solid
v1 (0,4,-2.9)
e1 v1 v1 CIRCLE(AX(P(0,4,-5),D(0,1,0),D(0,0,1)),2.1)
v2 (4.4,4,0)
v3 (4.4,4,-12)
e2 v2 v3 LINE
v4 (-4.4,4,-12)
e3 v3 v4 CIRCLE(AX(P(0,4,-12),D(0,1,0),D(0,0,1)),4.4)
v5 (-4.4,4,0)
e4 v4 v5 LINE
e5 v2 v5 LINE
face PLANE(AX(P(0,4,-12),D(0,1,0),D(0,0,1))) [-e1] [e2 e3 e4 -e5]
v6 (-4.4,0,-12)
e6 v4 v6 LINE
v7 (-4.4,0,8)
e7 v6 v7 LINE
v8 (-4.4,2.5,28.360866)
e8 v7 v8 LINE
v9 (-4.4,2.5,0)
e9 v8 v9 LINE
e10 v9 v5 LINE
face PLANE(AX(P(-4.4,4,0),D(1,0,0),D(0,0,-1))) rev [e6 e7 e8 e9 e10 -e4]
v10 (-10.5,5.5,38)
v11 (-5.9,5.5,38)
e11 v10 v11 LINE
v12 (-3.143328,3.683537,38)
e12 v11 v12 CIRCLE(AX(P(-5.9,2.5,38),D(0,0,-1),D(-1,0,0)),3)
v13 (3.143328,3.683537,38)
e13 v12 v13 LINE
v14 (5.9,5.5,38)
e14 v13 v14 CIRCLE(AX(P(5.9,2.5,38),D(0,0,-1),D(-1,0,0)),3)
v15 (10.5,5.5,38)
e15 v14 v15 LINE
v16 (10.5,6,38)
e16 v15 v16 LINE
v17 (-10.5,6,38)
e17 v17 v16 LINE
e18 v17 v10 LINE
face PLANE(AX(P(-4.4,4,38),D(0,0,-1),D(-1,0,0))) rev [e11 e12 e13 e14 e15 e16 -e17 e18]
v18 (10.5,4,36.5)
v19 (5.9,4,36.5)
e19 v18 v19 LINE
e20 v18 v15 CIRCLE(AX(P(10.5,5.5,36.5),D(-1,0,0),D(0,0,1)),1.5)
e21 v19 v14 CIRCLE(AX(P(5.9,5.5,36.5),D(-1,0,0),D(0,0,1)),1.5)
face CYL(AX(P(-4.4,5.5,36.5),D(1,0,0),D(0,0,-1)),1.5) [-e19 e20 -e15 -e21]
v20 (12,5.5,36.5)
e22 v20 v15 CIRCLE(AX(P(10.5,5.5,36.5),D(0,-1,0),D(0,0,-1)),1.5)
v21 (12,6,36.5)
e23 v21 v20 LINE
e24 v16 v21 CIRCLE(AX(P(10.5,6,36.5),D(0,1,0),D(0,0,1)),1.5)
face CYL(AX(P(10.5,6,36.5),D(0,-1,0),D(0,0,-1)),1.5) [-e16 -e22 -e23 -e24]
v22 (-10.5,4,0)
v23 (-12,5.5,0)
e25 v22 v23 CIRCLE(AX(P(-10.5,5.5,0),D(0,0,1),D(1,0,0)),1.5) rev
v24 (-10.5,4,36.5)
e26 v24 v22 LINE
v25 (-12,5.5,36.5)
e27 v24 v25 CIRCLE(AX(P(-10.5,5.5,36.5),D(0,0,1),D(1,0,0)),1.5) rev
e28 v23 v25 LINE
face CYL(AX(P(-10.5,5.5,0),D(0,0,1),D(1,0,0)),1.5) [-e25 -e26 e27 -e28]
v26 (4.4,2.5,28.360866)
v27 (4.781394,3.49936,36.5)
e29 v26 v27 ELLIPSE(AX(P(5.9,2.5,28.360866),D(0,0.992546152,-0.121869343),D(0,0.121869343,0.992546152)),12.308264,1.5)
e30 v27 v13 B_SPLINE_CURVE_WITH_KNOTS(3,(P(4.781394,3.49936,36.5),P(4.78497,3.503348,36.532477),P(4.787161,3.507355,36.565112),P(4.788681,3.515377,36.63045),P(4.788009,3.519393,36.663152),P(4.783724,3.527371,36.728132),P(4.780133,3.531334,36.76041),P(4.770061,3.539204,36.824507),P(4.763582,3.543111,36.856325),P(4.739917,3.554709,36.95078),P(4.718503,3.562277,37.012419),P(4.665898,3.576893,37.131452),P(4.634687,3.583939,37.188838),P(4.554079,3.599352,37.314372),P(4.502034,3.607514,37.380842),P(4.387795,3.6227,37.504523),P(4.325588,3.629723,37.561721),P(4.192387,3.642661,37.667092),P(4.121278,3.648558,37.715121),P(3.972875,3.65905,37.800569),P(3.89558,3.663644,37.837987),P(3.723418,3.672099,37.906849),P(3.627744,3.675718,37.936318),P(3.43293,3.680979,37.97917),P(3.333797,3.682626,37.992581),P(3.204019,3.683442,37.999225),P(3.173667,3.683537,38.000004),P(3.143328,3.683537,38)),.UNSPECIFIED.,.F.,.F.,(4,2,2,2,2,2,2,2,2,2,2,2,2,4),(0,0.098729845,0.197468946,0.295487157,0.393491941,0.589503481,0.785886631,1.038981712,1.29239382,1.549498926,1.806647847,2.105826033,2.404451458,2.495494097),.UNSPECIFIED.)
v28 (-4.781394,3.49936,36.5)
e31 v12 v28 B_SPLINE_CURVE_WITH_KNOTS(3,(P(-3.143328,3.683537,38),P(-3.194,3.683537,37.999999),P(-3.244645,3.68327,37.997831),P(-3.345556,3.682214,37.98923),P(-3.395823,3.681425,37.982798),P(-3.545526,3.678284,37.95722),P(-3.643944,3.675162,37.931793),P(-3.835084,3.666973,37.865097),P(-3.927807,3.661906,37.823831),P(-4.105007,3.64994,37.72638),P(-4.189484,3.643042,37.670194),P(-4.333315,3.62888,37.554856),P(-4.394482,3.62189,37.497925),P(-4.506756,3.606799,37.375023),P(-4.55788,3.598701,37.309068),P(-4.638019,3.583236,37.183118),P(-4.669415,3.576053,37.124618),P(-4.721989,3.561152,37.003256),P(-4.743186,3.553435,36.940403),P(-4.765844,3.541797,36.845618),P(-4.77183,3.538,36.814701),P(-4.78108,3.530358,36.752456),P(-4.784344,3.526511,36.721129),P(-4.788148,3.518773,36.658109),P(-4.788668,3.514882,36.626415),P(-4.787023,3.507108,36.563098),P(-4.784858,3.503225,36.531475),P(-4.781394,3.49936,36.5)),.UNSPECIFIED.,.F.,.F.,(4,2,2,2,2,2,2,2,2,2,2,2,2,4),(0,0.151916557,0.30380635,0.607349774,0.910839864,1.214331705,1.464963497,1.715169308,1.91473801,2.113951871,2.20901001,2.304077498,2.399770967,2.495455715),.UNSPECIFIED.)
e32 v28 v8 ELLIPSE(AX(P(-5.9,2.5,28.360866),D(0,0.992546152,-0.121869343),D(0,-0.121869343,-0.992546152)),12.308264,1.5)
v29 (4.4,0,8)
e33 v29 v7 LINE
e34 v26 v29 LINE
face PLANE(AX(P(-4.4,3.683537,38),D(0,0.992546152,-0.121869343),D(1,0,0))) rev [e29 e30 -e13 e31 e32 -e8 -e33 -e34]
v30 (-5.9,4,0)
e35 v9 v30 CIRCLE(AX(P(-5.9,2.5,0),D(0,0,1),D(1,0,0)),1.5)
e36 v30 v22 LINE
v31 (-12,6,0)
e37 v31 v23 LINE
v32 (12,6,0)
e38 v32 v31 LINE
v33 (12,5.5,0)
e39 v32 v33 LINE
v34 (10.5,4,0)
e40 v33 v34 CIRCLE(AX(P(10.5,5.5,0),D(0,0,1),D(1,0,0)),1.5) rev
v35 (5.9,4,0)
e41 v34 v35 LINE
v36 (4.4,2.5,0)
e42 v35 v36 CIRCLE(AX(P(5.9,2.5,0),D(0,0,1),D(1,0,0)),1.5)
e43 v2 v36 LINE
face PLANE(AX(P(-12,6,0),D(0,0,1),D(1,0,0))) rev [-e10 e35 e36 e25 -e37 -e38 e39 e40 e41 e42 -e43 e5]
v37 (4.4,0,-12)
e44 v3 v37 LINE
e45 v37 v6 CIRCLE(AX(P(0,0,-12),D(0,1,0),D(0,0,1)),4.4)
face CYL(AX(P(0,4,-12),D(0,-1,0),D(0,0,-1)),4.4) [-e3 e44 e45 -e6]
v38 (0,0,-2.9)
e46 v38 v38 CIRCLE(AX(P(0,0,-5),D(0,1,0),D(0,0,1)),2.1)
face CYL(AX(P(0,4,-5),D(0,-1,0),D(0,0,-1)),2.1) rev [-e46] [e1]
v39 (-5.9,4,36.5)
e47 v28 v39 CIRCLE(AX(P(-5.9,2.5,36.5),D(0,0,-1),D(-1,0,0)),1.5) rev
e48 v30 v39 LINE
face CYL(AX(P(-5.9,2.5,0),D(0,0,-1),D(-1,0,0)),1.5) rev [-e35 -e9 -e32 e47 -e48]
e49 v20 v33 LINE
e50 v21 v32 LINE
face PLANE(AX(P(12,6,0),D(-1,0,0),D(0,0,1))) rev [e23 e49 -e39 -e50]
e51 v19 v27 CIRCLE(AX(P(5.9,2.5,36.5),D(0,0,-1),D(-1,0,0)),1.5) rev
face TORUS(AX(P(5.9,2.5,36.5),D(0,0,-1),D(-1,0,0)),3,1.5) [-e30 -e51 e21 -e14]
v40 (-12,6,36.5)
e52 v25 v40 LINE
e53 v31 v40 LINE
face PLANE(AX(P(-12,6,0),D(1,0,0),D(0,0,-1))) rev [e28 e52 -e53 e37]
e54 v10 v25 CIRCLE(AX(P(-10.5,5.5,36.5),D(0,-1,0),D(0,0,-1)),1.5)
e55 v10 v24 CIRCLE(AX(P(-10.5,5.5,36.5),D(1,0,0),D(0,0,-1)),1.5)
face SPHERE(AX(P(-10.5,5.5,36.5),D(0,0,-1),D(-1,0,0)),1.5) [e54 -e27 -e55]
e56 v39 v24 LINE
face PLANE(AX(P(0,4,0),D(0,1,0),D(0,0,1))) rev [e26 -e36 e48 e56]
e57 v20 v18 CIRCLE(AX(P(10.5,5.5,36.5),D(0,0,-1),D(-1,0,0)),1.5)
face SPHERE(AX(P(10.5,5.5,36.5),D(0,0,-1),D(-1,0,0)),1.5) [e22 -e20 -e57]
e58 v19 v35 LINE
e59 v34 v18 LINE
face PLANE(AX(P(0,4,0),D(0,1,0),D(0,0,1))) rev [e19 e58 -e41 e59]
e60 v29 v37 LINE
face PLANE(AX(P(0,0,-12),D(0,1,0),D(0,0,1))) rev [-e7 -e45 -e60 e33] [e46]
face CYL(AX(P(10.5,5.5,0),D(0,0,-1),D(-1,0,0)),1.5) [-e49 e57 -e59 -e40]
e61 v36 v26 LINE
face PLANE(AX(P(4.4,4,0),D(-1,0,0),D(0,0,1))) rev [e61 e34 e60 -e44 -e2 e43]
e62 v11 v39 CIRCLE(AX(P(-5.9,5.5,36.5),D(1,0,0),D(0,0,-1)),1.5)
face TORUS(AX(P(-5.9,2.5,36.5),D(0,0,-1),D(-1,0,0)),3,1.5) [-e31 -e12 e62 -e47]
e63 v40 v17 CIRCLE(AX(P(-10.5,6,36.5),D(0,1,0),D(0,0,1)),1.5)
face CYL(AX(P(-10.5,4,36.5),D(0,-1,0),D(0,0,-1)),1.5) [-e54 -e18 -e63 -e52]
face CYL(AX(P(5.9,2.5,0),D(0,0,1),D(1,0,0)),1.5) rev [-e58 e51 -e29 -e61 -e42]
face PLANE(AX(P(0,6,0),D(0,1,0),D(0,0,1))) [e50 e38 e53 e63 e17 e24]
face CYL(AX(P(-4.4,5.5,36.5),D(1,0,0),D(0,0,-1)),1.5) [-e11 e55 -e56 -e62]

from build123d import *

# Parameters (mm, degrees)
SKETCH2_R           = 2.1
BOSS_EXTRUDE1_DEPTH = 4
BOSS_EXTRUDE2_DEPTH = 2
CHAMFER1_SIZE       = 30
CHAMFER1_SIZE2      = 3.683536827087146
FILLET2_R           = 1.5
FILLET4_R           = 1.5


with BuildPart() as part:
    # Sketch2 → Boss-Extrude1 (new body)
    with BuildSketch(Plane(origin=(0, 0, 0), x_dir=(1, 0, 0), z_dir=(0, 1, 0))):
        with BuildLine():
            Line((-4.4, -1.507e-14), (-4.4, 12))
            ThreePointArc((-4.4, 12), (2.7e-16, 16.4), (4.4, 12))
            Line((4.4, 12), (4.4, 1.507e-14))
            Line((4.4, 1.507e-14), (4.4, -38.000000000000014))
            Line((4.4, -38.000000000000014), (-4.399999999999994, -38.000000000000014))
            Line((-4.399999999999994, -38.000000000000014), (-4.4, -1.507e-14))
        make_face()
        with Locations(Location((0, 5, 0), (0, 0, 270))):
            Circle(SKETCH2_R, mode=Mode.SUBTRACT)
    extrude(amount=BOSS_EXTRUDE1_DEPTH)

    # Sketch3 → Boss-Extrude2 (add)
    with BuildSketch(Plane(origin=(0, 4, 0), x_dir=(1, 0, 0), z_dir=(0, 1, 0))):
        Polygon((-12, 0), (12, 0), (12.000000000000002, -38), (-11.999999999999995, -38), align=None)
    extrude(amount=BOSS_EXTRUDE2_DEPTH)

    # Chamfer1
    chamfer1_edges = [part.edges().sort_by_distance(p)[0] for p in [
        (3.55e-15, 0, 38.000000000000014),
    ]]
    chamfer1_side = [part.faces().sort_by_distance(p)[0] for p in [
        (1.53e-15, 0, 11.756614981879217),
    ]]
    chamfer(chamfer1_edges, length=CHAMFER1_SIZE, length2=CHAMFER1_SIZE2, reference=chamfer1_side[0])

    # Fillet2
    # the kernel refuses this fillet: 1.5 mm, written as the material it adds along each edge
    with BuildSketch(Plane(origin=(-4.399999999999994, 4, 38.000000000000014), x_dir=(-4.14e-15, -1, 0), z_dir=(-1.2e-16, 0, -1))) as fillet2_piece_1_section:
        with BuildLine():
            CenterArc((FILLET2_R, FILLET2_R), FILLET2_R, 180, 89.99999999999977)
            Line((6.22e-15, FILLET2_R), (0, 0))
            Line((0, 0), (FILLET2_R, 0))
        make_face()
    fillet2_piece_1 = extrude(amount=38.000000000000014, mode=Mode.PRIVATE)
    fillet2_piece_1 = split(fillet2_piece_1, bisect_by=Plane(origin=(-4.741166225178414, 1.3298279167086908, 18.830579243267316), z_dir=(0, 0.992546151641322, -0.12186934340514775)), keep=Keep.TOP, mode=Mode.PRIVATE)
    add(fillet2_piece_1)
    with BuildSketch(Plane(origin=(4.4, 4, 0), x_dir=(0, -1, 0), z_dir=(0, 0, 1))) as fillet2_piece_2_section:
        with BuildLine():
            CenterArc((FILLET2_R, FILLET2_R), FILLET2_R, 180, 90)
            Line((0, FILLET2_R), (0, 0))
            Line((0, 0), (FILLET2_R, 0))
        make_face()
    fillet2_piece_2 = extrude(amount=38.000000000000014, mode=Mode.PRIVATE)
    fillet2_piece_2 = split(fillet2_piece_2, bisect_by=Plane(origin=(4.741166225178429, 1.3298279167086202, 18.830579243266737), z_dir=(0, 0.992546151641322, -0.12186934340514775)), keep=Keep.TOP, mode=Mode.PRIVATE)
    add(fillet2_piece_2)
    # the kernel refuses this fillet: 1.5 mm, written as the material it takes off along each edge
    with BuildSketch(Plane(origin=(-11.999999999999995, 4, 41.75), x_dir=(0, 1, 0), z_dir=(-1.4e-16, 0, -1))) as fillet2_2_piece_1:
        with BuildLine():
            CenterArc((FILLET2_R, FILLET2_R), FILLET2_R, 180, 90)
            Line((0, FILLET2_R), (0, 0))
            Line((0, 0), (FILLET2_R, 0))
        make_face()
    extrude(amount=45.5, mode=Mode.SUBTRACT)
    with BuildSketch(Plane(origin=(12, 4, -3.75), x_dir=(-1, 0, 5e-17), z_dir=(5e-17, 0, 1))) as fillet2_2_piece_2:
        with BuildLine():
            CenterArc((FILLET2_R, -FILLET2_R), FILLET2_R, 90, 90)
            Line((0, -FILLET2_R), (0, 0))
            Line((0, 0), (FILLET2_R, 0))
        make_face()
    extrude(amount=45.5, mode=Mode.SUBTRACT)

    # Fillet4
    fillet4_edges = [part.edges().sort_by_distance(p)[0] for p in [
        (5.41281689306181, 3.918679886483928, 38),
        (8.2, 4, 38),
        (11.560660171779821, 4.439339828220179, 38),
        (-5.41281689306181, 3.918679886483928, 38),
        (-8.200000000000001, 4, 38),
        (-11.560660171779821, 4.439339828220179, 38),
        (12.000000000000002, 5.75, 38),
        (-11.999999999999995, 5.75, 38),
    ]]
    fillet(fillet4_edges, radius=FILLET4_R)


solid = part.part
